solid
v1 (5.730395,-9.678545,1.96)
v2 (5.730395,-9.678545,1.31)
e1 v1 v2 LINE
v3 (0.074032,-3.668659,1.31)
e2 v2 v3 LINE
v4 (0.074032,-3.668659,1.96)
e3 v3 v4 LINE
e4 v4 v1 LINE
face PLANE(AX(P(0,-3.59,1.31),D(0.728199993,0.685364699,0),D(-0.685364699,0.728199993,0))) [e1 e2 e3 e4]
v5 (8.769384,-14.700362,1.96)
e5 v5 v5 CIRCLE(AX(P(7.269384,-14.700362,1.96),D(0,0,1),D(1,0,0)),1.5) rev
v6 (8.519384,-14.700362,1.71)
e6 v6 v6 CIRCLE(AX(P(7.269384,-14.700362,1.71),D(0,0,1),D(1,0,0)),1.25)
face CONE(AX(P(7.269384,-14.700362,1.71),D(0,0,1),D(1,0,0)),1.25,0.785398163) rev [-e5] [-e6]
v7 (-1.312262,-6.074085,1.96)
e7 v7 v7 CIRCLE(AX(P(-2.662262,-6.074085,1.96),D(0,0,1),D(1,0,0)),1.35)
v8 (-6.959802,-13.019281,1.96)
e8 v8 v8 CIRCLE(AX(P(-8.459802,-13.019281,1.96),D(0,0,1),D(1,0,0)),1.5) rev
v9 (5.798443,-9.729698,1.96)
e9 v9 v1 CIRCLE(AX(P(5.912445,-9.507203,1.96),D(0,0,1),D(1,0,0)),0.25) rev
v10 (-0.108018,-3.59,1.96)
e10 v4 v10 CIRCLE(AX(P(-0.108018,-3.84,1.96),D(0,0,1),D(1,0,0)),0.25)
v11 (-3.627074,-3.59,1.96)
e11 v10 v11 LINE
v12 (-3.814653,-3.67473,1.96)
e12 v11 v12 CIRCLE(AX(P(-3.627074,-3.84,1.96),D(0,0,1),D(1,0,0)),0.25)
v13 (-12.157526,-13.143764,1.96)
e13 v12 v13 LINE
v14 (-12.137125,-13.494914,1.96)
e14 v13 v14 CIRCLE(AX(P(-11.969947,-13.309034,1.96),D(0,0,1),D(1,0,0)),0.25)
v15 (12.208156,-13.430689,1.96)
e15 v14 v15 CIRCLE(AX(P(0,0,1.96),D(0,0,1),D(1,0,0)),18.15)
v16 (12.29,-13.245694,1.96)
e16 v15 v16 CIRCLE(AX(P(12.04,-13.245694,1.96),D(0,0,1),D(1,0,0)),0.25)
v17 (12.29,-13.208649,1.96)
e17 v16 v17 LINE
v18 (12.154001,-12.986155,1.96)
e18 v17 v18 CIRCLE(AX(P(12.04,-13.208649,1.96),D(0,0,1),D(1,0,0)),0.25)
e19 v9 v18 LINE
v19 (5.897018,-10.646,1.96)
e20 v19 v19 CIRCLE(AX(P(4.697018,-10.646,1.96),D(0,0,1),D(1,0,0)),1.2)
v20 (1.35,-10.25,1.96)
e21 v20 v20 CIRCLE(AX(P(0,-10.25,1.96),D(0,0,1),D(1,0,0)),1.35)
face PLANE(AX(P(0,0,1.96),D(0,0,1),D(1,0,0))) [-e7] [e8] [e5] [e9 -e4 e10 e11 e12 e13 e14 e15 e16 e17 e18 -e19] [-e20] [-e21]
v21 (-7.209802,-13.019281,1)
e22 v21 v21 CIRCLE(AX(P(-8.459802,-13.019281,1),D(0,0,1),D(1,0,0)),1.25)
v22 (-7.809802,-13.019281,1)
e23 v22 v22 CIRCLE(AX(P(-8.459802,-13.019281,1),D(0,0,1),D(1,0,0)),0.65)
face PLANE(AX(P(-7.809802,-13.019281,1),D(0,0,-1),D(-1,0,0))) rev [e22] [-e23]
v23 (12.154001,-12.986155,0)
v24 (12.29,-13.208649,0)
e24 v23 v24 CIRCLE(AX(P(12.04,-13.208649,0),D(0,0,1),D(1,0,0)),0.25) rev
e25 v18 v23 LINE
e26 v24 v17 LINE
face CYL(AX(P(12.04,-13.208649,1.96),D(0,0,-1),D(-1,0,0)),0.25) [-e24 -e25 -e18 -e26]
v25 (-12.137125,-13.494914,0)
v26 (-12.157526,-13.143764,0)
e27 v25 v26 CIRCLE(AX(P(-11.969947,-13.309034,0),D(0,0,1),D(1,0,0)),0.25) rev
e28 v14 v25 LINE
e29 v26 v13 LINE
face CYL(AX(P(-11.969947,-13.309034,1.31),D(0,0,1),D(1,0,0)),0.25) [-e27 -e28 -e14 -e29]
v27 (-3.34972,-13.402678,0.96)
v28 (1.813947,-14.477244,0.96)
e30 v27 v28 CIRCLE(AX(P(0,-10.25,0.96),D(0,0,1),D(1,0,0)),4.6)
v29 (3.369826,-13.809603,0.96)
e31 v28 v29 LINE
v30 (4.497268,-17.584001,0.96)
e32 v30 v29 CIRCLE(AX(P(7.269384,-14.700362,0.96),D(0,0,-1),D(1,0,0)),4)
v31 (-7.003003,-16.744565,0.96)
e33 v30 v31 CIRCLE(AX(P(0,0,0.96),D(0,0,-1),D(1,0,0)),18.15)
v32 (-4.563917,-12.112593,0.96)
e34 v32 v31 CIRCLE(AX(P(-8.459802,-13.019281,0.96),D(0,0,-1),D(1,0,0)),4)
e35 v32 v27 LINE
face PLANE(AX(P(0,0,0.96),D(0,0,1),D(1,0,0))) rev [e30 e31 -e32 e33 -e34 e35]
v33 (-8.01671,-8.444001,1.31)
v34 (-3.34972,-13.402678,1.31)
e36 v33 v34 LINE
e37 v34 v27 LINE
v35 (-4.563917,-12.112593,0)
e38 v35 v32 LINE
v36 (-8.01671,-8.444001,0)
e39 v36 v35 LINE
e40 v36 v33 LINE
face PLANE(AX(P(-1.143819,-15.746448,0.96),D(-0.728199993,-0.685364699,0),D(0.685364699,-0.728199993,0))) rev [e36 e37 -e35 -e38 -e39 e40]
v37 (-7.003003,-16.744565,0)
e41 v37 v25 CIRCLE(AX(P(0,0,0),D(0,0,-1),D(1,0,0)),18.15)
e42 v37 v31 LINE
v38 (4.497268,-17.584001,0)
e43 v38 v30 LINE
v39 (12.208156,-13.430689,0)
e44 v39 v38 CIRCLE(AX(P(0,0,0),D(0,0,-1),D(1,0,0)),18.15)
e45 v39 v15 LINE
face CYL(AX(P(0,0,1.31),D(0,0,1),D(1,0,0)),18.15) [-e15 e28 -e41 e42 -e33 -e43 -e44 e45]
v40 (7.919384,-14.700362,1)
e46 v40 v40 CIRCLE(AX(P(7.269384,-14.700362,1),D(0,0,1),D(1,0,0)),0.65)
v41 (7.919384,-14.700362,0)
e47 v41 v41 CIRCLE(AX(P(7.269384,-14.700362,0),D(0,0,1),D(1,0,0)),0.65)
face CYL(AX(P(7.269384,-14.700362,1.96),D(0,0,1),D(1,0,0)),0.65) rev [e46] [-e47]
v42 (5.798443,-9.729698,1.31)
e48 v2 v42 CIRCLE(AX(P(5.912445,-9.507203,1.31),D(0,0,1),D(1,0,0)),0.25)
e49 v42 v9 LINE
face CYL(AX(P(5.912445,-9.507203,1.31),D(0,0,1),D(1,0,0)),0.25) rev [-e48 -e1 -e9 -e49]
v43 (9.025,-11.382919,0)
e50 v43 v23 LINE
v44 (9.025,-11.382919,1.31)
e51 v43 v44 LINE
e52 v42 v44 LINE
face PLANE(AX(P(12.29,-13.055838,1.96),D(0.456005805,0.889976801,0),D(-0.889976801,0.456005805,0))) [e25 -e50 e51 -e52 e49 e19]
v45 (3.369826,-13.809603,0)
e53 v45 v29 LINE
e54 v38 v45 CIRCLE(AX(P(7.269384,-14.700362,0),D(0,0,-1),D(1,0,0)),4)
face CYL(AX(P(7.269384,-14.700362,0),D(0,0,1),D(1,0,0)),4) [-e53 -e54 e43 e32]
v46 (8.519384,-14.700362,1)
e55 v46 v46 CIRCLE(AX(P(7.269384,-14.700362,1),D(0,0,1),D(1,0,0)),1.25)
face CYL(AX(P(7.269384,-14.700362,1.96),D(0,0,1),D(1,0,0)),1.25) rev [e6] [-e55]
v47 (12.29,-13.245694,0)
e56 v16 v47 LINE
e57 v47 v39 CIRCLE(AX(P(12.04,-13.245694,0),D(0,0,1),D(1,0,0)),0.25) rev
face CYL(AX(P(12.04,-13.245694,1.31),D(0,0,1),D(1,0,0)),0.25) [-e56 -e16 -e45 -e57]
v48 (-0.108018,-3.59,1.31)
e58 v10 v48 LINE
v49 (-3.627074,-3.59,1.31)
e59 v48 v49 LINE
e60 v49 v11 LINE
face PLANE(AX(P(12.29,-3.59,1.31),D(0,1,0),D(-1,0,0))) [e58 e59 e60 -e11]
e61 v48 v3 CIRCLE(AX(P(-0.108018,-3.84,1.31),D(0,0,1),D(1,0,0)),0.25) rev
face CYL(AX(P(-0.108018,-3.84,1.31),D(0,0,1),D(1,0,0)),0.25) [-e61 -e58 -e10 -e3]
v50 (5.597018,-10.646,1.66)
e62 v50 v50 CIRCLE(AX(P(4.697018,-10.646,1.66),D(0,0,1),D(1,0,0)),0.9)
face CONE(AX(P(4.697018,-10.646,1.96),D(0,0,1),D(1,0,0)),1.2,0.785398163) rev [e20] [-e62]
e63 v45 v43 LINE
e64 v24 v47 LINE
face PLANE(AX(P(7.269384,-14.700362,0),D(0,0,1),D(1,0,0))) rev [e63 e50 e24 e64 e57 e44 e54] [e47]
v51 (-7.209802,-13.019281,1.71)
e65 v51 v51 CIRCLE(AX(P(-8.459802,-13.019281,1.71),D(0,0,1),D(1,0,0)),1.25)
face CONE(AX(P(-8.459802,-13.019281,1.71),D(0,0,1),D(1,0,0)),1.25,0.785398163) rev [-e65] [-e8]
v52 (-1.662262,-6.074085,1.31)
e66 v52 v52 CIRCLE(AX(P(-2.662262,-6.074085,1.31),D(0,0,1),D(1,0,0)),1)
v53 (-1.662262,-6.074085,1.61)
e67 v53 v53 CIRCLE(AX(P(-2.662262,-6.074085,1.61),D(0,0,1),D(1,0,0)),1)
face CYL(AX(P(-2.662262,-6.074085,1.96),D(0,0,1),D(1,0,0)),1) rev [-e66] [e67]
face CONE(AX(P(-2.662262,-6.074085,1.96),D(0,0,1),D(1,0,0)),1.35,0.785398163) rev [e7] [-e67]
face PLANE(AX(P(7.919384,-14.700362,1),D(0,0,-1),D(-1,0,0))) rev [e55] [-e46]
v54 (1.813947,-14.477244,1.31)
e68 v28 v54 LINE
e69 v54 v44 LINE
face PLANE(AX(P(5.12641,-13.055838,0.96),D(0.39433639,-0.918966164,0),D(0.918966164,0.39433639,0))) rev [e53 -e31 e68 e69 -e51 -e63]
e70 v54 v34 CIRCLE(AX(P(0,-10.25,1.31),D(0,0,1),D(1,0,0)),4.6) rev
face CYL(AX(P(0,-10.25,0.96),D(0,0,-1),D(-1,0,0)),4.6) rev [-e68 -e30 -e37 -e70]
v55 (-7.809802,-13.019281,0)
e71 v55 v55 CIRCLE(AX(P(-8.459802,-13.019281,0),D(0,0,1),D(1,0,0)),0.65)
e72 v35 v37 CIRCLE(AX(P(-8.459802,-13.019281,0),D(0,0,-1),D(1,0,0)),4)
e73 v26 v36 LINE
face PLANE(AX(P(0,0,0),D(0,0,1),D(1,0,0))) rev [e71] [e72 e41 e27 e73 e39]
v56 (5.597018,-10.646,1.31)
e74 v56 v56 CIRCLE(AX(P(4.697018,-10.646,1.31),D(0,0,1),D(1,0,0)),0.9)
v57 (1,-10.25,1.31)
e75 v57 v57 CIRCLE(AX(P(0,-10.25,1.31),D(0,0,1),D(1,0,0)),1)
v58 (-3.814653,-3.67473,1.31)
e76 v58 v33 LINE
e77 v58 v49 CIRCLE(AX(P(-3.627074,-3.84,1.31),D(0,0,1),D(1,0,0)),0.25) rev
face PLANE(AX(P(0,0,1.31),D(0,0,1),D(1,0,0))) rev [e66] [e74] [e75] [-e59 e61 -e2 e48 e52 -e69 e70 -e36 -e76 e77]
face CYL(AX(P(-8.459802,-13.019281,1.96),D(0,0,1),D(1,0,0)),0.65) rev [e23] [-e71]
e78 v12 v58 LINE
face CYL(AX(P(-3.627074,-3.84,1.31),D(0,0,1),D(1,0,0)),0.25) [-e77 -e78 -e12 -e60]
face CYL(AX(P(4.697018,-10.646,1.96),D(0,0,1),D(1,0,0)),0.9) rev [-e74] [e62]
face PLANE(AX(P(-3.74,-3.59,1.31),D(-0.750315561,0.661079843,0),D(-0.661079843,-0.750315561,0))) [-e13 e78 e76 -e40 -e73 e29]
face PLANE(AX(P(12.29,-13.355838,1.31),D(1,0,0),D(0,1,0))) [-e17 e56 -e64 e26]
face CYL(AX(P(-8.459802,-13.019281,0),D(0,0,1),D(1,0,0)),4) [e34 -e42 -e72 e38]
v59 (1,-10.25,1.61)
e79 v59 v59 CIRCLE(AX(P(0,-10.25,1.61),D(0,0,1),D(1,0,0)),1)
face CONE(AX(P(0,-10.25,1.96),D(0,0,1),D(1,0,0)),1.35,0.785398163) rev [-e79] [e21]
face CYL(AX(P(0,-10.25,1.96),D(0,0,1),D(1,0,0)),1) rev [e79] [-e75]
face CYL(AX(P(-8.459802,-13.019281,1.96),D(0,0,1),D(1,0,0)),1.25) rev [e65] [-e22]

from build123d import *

# Parameters (mm, degrees)
BOSS_EXTRUDE1_DEPTH = 0.65
SKETCH2_W           = 0.65
SKETCH2_H           = 9.465837675
CUT_EXTRUDE1_DEPTH  = 12.29
BOSS_EXTRUDE2_DEPTH = 0.35
BOSS_EXTRUDE3_DEPTH = 0.96
BOSS_EXTRUDE4_DEPTH = 0.96
DRAFT1_START        = 1.31
DRAFT1_DEPTH        = 0.65
DRAFT2_DEPTH        = 1.96
DRAFT2_START        = 1.31
DRAFT2_2_DEPTH      = 0.65
HOLE1_D             = 1.3
HOLE1_CBORE_D       = 2.5
HOLE1_CBORE_DEPTH   = 0.96
HOLE2_D             = 2
HOLE2_DEPTH         = 1.960025
HOLE2_CSINK_D       = 2.7
HOLE2_CSINK_ANGLE   = 90
HOLE3_D             = 1.8
HOLE3_DEPTH         = 1.960025
HOLE3_CSINK_D       = 2.4
HOLE3_CSINK_ANGLE   = 90
CHAMFER1_SIZE       = 0.25
FILLET1_R           = 0.25
FILLET2_R           = 4.6


# Read off the part's stored shape, not the designer's step: Draft1, Draft2
with BuildPart() as part:
    # Sketch1 → Boss-Extrude1 (new body)
    with BuildSketch(Plane.XY.offset(1.96)):
        with BuildLine():
            Line((-3.74, -3.59), (-12.32, -13.328169417))
            ThreePointArc((-12.32, -13.328169417), (-0.020405468, -18.149988529), (12.29, -13.355837675))
            Line((12.29, -13.355837675), (12.29, -3.59))
            Line((12.29, -3.59), (-3.74, -3.59))
        make_face()
    extrude(amount=-BOSS_EXTRUDE1_DEPTH)

    # Sketch2 → Cut-Extrude1 (cut)
    with BuildSketch(Plane(origin=(12.29, 0, 0), x_dir=(0, 0, -1), z_dir=(1, 0, 0))):
        with Locations((-1.635, -8.322918838)):
            Rectangle(SKETCH2_W, SKETCH2_H)
    extrude(amount=-CUT_EXTRUDE1_DEPTH, mode=Mode.SUBTRACT)

    # Sketch3 → Boss-Extrude2 (add)
    with BuildSketch(Plane(origin=(0, 0, 1.31), x_dir=(-1, 0, 0), z_dir=(0, 0, -1))):
        with BuildLine():
            Line((1.143818798, -15.746447607), (8.016709975, -8.444000732))
            Line((8.016709975, -8.444000732), (12.32, -13.328169417))
            ThreePointArc((12.32, -13.328169417), (0.020405468, -18.149988529), (-12.29, -13.355837675))
            Line((-12.29, -13.355837675), (-12.29, -13.055837675))
            Line((-12.29, -13.055837675), (-5.126410253, -13.055837675))
            Line((-5.126410253, -13.055837675), (1.143818798, -15.746447607))
        make_face()
    extrude(amount=BOSS_EXTRUDE2_DEPTH)

    # Sketch4 → Boss-Extrude3 (add)
    with BuildSketch(Plane(origin=(0, 0, 0.96), x_dir=(-1, 0, 0), z_dir=(0, 0, -1))):
        with BuildLine():
            Line((-12.29, -13.055837675), (-5.126410253, -13.055837675))
            Line((-5.126410253, -13.055837675), (-3.369826358, -13.809603133))
            ThreePointArc((-3.369826358, -13.809603133), (-3.436718106, -15.84520854), (-4.497267699, -17.584000775))
            ThreePointArc((-4.497267699, -17.584000775), (-8.655774373, -15.953058328), (-12.29, -13.355837675))
            Line((-12.29, -13.355837675), (-12.29, -13.055837675))
        make_face()
    extrude(amount=BOSS_EXTRUDE3_DEPTH)

    # Sketch5 → Boss-Extrude4 (add)
    with BuildSketch(Plane(origin=(0, 0, 0.96), x_dir=(-1, 0, 0), z_dir=(0, 0, -1))):
        with BuildLine():
            Line((4.563917341, -12.112592905), (8.016709975, -8.444000732))
            Line((8.016709975, -8.444000732), (12.32, -13.328169417))
            ThreePointArc((12.32, -13.328169417), (9.811348174, -15.269575862), (7.003003277, -16.744564644))
            ThreePointArc((7.003003277, -16.744564644), (4.920508914, -14.882988414), (4.563917341, -12.112592905))
        make_face()
    extrude(amount=BOSS_EXTRUDE4_DEPTH)

    # Draft1 outline → Draft1 (add)
    with BuildSketch(Plane.XY.offset(DRAFT1_START)):
        Polygon((0, -13.055837675), (8.909023694, -13.055837675), (0, -3.59), align=None)
    extrude(amount=DRAFT1_DEPTH)

    # Draft2 outline → Draft2 (add)
    with BuildSketch(Plane.XY):
        Polygon((12.29, -13.055837675), (9.025, -11.382918837), (5.126410253, -13.055837675), align=None)
    extrude(amount=DRAFT2_DEPTH)

    # Draft2 2 outline → Draft2 2 (add)
    with BuildSketch(Plane.XY.offset(DRAFT2_START)):
        Polygon((7.820834561, -11.899636721), (9.025, -11.382918837), (5.76, -9.71), align=None)
    extrude(amount=DRAFT2_2_DEPTH)

    # Hole1 (through all)
    with Locations(Plane.XY.offset(1.96)):
        with Locations((7.269383833, -14.700362078), (-8.459801911, -13.019281065)):
            CounterBoreHole(HOLE1_D / 2, HOLE1_CBORE_D / 2, HOLE1_CBORE_DEPTH)

    # Hole2
    with Locations(Plane.XY.offset(1.96)):
        with Locations((0, -10.25), (-2.662261998, -6.0740848)):
            CounterSinkHole(HOLE2_D / 2, HOLE2_CSINK_D / 2, depth=HOLE2_DEPTH, counter_sink_angle=HOLE2_CSINK_ANGLE)

    # Hole3
    with Locations(Plane.XY.offset(1.96)):
        with Locations((4.697017702, -10.646000252)):
            CounterSinkHole(HOLE3_D / 2, HOLE3_CSINK_D / 2, depth=HOLE3_DEPTH, counter_sink_angle=HOLE3_CSINK_ANGLE)

    # Chamfer1
    chamfer1_edges = [part.edges().sort_by_distance(p)[0] for p in [
        (-9.709801911, -13.019281065, 1.96),
        (6.019383833, -14.700362078, 1.96),
    ]]
    chamfer(chamfer1_edges, length=CHAMFER1_SIZE)

    # Fillet1
    fillet1_edges = [part.edges().sort_by_distance(p)[0] for p in [
        (5.76, -9.71, 1.635),
        (-12.32, -13.328169417, 0.98),
        (12.29, -13.055837675, 0.98),
        (12.29, -13.355837675, 0.98),
        (0, -3.59, 1.635),
        (-3.74, -3.59, 1.635),
    ]]
    fillet(fillet1_edges, radius=FILLET1_R)

    # Fillet2
    fillet2_edges = [part.edges().sort_by_distance(p)[0] for p in [
        (-1.143818798, -15.746447607, 1.135),
    ]]
    fillet(fillet2_edges, radius=FILLET2_R)


solid = part.part
